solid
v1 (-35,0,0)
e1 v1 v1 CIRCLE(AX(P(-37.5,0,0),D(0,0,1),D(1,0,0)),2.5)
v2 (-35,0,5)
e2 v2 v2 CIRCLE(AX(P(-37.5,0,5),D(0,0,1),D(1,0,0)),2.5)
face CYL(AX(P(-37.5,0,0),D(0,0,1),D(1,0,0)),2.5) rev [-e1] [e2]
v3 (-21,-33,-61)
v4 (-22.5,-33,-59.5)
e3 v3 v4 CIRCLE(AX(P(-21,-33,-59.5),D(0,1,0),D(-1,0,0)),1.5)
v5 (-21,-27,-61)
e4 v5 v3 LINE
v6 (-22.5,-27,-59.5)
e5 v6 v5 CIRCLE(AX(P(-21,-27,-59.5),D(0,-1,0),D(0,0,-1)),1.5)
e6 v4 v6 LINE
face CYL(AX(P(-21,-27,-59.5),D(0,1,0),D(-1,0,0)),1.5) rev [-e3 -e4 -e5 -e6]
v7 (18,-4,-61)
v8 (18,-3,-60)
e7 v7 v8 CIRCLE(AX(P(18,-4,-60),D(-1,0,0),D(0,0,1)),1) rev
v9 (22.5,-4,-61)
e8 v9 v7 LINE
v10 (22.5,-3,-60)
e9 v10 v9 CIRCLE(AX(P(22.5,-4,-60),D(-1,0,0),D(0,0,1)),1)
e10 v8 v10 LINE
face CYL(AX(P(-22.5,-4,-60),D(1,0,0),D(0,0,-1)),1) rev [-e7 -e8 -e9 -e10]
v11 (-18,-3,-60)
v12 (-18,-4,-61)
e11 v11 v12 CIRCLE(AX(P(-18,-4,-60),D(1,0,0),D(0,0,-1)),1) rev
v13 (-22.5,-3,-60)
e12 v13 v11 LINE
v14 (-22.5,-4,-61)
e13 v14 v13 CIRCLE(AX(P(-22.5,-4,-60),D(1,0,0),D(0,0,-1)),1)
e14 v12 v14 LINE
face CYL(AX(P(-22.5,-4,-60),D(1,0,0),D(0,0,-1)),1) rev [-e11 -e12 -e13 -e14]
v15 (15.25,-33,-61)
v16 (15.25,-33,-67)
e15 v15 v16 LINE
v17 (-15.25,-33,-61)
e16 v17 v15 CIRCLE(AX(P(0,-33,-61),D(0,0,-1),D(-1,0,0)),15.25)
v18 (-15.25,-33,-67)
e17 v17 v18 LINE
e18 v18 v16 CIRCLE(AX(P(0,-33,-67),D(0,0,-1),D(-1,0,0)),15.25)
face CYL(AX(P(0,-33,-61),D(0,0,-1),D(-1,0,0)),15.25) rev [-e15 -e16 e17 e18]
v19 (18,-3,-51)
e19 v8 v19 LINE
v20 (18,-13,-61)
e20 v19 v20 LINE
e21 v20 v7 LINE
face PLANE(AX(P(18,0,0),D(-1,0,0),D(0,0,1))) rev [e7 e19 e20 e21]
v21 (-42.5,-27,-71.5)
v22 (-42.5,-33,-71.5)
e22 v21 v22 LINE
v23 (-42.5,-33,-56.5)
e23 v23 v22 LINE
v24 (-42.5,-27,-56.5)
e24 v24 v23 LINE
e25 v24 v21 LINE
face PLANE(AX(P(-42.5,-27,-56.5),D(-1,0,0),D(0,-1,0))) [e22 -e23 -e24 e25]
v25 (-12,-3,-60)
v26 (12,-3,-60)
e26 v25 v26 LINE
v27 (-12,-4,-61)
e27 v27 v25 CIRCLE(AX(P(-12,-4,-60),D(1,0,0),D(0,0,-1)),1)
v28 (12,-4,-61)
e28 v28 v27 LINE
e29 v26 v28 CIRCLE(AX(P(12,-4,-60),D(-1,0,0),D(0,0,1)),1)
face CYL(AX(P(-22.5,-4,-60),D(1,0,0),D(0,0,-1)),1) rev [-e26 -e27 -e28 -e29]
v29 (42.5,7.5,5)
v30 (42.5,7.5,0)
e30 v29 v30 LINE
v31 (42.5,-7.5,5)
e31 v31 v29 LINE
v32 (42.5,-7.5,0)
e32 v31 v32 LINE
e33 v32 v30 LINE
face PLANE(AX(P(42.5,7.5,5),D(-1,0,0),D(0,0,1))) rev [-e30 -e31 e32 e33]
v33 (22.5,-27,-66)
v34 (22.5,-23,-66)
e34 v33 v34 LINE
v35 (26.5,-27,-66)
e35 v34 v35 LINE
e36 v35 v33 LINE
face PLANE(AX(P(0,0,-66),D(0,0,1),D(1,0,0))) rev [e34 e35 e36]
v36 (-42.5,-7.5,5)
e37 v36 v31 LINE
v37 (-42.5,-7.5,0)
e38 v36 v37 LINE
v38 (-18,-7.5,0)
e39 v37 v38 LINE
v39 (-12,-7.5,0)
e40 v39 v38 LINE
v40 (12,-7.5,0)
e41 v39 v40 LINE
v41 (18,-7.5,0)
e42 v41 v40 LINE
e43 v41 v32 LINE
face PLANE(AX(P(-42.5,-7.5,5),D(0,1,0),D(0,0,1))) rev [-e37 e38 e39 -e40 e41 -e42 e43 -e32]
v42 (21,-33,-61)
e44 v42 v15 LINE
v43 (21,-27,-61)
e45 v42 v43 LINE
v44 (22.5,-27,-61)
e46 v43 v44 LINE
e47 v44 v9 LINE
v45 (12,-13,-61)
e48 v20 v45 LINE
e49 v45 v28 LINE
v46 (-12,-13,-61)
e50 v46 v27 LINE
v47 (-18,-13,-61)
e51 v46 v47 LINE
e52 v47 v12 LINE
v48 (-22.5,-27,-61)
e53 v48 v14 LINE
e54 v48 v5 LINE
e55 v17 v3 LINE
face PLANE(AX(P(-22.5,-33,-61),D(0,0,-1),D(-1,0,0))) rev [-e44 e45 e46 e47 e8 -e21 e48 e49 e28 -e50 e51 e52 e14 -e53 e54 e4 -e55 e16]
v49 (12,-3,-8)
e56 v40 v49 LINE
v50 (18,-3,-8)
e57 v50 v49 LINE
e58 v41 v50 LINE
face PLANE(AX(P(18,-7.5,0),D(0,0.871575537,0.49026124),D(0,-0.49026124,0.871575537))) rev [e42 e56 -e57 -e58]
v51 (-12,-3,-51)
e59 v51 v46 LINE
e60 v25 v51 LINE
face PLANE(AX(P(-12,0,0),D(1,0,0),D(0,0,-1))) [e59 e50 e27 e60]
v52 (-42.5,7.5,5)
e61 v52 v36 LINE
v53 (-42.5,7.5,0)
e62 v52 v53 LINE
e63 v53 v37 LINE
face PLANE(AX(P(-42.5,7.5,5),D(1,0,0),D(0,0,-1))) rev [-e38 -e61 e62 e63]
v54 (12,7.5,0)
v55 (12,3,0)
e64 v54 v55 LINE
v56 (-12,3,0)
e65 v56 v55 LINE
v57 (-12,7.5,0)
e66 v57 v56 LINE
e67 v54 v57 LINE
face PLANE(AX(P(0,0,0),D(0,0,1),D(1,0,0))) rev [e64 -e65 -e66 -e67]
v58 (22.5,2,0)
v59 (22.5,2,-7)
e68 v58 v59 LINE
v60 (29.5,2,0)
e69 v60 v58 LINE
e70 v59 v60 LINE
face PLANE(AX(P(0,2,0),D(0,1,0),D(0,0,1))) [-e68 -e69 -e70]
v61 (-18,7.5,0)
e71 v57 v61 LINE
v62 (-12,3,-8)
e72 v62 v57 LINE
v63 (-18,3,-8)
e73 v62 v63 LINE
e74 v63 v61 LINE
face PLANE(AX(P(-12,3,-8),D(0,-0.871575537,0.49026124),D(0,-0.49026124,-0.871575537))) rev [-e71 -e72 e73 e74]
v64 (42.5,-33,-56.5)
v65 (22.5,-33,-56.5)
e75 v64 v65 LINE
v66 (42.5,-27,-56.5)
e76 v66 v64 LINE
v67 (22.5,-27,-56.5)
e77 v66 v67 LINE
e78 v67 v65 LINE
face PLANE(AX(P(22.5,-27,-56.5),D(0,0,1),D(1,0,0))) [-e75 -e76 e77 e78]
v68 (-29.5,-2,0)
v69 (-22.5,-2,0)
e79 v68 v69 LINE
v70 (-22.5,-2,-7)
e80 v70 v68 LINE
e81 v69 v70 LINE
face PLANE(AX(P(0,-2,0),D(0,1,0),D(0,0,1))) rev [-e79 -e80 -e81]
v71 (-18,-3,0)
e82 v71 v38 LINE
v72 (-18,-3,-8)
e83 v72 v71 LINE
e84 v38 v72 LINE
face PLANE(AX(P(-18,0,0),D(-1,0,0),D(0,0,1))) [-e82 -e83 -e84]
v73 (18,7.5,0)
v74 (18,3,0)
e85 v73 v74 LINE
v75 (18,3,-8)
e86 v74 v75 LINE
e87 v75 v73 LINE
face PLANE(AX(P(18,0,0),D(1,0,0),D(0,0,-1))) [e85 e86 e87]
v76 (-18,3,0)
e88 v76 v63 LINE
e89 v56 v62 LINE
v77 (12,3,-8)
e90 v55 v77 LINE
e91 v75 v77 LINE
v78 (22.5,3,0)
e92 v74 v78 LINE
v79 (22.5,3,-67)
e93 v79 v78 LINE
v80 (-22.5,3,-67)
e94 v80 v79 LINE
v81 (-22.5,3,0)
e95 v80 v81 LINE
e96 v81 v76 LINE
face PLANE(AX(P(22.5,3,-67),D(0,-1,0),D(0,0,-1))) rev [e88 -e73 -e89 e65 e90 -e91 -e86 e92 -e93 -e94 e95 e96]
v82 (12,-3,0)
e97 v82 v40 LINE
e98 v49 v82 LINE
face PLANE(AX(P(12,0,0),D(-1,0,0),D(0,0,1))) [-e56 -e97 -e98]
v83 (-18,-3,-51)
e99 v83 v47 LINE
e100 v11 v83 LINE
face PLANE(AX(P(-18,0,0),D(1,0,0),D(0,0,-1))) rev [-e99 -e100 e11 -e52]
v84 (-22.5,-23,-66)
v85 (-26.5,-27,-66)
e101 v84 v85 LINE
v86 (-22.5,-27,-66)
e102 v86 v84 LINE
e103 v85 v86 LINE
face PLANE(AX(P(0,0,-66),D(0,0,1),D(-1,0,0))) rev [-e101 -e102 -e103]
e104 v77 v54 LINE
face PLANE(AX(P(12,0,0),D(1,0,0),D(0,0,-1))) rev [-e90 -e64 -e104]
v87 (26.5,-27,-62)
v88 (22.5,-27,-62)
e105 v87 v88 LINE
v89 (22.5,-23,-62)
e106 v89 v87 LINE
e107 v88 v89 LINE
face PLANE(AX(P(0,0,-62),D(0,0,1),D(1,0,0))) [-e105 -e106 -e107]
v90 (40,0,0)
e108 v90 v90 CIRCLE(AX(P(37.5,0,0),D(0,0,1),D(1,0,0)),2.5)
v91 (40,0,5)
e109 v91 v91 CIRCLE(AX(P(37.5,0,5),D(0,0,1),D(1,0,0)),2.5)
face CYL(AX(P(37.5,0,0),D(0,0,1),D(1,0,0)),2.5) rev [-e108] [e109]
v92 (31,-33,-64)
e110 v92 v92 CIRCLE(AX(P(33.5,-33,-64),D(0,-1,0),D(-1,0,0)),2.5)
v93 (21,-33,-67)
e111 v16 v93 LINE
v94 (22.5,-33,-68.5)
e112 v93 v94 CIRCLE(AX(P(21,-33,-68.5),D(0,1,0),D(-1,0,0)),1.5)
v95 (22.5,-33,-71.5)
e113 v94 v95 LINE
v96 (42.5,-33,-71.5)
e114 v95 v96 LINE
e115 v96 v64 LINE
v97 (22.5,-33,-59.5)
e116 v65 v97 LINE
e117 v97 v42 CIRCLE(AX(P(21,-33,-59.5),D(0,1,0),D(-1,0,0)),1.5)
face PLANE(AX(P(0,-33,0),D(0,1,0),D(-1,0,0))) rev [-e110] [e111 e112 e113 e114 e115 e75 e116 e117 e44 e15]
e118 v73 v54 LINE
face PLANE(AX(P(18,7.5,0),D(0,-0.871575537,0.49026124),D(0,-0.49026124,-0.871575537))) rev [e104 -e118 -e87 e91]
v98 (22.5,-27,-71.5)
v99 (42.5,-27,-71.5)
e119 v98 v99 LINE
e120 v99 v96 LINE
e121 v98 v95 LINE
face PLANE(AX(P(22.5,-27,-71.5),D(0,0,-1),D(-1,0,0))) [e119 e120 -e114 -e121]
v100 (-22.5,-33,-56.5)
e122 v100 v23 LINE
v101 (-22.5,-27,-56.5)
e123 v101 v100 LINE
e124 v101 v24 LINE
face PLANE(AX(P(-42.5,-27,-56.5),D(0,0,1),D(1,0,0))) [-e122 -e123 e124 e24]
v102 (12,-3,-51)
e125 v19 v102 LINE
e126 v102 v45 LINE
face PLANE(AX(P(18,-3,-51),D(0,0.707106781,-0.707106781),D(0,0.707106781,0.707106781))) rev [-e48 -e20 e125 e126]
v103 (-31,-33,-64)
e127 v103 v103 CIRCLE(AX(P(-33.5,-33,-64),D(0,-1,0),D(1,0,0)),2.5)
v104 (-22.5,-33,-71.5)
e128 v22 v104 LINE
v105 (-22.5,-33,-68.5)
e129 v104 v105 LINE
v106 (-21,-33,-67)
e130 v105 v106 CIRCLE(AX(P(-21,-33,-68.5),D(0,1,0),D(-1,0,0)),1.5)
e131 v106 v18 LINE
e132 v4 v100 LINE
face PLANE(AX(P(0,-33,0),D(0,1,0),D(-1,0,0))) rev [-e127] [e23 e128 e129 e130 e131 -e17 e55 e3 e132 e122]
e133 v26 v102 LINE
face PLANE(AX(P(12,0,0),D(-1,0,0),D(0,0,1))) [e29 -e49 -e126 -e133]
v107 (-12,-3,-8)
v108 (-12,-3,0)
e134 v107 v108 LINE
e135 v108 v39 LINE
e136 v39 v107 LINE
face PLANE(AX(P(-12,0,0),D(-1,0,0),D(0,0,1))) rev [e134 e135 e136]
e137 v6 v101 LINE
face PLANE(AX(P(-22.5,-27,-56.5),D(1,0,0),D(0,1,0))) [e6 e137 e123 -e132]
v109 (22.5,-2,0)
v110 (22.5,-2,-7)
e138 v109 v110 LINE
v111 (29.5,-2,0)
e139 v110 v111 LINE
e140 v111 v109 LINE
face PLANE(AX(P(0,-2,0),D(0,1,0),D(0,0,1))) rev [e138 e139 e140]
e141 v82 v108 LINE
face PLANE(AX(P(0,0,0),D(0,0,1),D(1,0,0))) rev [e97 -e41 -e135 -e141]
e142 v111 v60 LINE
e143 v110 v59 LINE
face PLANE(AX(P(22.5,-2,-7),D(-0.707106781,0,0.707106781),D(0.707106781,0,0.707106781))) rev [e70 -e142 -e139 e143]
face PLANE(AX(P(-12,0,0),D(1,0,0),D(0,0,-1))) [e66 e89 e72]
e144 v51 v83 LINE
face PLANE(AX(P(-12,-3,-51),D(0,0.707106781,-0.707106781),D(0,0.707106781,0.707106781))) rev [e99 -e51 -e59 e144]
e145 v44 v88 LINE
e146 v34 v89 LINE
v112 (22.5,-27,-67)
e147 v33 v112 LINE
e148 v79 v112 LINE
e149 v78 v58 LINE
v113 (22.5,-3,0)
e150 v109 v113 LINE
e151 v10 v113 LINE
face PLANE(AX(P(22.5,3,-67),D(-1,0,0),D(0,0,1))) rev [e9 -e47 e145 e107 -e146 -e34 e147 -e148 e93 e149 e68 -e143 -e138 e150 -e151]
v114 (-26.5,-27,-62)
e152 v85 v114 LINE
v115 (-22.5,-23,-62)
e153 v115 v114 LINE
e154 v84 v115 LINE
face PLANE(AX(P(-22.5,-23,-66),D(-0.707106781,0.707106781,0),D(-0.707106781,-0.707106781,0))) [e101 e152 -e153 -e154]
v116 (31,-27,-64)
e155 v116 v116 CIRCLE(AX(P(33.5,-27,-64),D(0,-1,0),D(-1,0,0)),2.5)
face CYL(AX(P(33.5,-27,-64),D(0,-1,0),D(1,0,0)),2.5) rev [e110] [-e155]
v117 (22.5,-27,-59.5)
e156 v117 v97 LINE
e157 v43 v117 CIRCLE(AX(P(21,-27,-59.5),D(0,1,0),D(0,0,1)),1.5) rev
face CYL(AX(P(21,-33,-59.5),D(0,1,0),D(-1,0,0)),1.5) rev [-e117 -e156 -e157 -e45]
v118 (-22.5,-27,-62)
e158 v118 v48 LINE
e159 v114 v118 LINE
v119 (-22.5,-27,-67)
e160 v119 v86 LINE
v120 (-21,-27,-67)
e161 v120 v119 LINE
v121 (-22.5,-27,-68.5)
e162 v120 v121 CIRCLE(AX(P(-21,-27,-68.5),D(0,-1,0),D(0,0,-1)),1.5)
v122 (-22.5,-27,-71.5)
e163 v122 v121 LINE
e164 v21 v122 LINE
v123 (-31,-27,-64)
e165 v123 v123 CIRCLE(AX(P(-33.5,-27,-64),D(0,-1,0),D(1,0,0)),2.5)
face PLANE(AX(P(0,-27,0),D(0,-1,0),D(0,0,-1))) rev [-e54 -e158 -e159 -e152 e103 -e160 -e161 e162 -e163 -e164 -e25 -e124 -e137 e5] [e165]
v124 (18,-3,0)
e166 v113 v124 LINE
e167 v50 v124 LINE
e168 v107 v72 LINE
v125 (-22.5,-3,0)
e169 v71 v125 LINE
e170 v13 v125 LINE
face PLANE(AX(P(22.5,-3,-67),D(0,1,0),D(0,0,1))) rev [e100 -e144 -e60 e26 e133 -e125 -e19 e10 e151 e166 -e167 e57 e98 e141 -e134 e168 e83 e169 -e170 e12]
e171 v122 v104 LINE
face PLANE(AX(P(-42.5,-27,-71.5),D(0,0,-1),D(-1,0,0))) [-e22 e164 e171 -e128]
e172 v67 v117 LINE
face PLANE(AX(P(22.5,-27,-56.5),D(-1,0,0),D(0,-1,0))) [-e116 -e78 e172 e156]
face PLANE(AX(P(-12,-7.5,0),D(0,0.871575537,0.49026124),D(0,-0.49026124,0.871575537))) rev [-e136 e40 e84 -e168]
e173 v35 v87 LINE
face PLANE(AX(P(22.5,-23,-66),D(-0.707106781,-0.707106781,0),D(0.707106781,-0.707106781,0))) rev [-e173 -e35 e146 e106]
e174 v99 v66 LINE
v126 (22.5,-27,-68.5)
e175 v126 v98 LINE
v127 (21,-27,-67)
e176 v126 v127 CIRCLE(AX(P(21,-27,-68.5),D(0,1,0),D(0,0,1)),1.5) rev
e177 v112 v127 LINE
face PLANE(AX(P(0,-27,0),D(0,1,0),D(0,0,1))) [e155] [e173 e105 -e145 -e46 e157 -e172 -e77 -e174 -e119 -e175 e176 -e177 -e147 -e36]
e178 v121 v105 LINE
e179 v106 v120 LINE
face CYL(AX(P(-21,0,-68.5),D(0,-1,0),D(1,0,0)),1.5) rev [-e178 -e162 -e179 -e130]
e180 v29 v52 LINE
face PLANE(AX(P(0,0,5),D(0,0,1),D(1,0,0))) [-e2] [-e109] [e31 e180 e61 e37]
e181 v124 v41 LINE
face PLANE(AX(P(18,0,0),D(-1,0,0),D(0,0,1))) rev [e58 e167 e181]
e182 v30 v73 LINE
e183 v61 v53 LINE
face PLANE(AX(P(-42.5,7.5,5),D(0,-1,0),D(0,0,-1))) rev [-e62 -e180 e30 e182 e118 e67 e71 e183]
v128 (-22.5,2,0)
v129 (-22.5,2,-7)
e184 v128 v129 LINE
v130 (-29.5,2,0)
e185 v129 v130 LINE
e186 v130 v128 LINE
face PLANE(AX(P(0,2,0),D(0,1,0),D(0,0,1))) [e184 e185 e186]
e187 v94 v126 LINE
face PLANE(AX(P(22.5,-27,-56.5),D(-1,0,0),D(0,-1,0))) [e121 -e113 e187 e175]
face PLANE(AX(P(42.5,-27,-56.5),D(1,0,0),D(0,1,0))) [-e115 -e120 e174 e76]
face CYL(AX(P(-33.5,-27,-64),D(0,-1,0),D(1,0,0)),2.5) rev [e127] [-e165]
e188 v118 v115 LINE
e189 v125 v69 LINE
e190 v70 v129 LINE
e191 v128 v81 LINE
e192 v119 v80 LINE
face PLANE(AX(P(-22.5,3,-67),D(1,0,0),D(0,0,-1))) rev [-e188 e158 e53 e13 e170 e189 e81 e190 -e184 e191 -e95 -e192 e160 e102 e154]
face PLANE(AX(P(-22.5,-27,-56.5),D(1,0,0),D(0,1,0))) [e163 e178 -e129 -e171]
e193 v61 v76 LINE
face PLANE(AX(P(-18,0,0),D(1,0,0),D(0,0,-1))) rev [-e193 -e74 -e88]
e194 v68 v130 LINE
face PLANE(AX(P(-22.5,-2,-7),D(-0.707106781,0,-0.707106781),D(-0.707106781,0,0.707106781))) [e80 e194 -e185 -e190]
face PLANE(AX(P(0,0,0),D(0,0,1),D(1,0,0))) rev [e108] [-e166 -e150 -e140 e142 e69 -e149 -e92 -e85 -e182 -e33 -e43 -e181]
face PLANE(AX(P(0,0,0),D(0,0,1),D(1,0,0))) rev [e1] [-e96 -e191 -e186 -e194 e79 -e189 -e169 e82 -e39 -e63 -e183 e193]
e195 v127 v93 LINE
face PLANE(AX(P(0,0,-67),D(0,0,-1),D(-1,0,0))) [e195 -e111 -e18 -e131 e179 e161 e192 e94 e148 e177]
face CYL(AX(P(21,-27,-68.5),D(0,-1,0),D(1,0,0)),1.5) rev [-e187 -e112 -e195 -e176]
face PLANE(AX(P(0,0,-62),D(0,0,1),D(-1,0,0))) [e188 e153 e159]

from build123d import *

# Parameters (mm, degrees)
SKETCH_1_W          = 85
SKETCH_1_H          = 15
EXTRUDE_1_DEPTH     = 5
SKETCH_2_R          = 2.5
CUT_EXTRUDE_1_DEPTH = 5
SKETCH_3_W          = 45
SKETCH_3_H          = 6
EXTRUDE_2_DEPTH     = 67
SKETCH_4_W          = 45
SKETCH_4_H          = 6
EXTRUDE_3_DEPTH     = 30
SKETCH_7_W          = 20
SKETCH_7_H          = 15
EXTRUDE_4_DEPTH     = 6
CUT_EXTRUDE_3_DEPTH = 6
EXTRUDE_5_DEPTH     = 3
EXTRUDE_6_DEPTH     = 3
FILLET_1_R          = 1
SKETCH_11_R         = 2.5
CUT_EXTRUDE_4_DEPTH = 6
FILLET_2_R          = 1.5
EXTRUDE_7_DEPTH     = 2
EXTRUDE_8_DEPTH     = 2
EXTRUDE_9_DEPTH     = 3
EXTRUDE_10_DEPTH    = 3


with BuildPart() as part:
    # 草图1 → 凸台-拉伸1 (new body)
    with BuildSketch(Plane.XY):
        Rectangle(SKETCH_1_W, SKETCH_1_H)
    extrude(amount=EXTRUDE_1_DEPTH)

    # 草图2 → 切除-拉伸1 (cut)
    with BuildSketch(Plane.XY.offset(5)):
        with Locations((-37.5, 0)):
            Circle(SKETCH_2_R)
        with Locations((37.5, 0)):
            Circle(SKETCH_2_R)
    extrude(amount=-CUT_EXTRUDE_1_DEPTH, mode=Mode.SUBTRACT)

    # 草图3 → 凸台-拉伸2 (add)
    with BuildSketch(Plane(origin=(0, 0, 0), x_dir=(-1, 0, 0), z_dir=(0, 0, -1))):
        Rectangle(SKETCH_3_W, SKETCH_3_H)
    extrude(amount=EXTRUDE_2_DEPTH)

    # 草图4 → 凸台-拉伸3 (add)
    with BuildSketch(Plane.XZ.offset(3)):
        with Locations((0, -64)):
            Rectangle(SKETCH_4_W, SKETCH_4_H)
    extrude(amount=EXTRUDE_3_DEPTH)

    # 草图7 → 凸台-拉伸4 (add)
    with BuildSketch(Plane.XZ.offset(33)):
        with Locations((32.5, -64)):
            Rectangle(SKETCH_7_W, SKETCH_7_H)
        with Locations((-32.5, -64)):
            Rectangle(SKETCH_7_W, SKETCH_7_H)
    extrude(amount=-EXTRUDE_4_DEPTH)

    # 草图5 → 切除-拉伸3 (cut)
    with BuildSketch(Plane(origin=(0, 0, -67), x_dir=(-1, 0, 0), z_dir=(0, 0, -1))):
        with BuildLine():
            Line((-15.25, -33), (15.25, -33))
            ThreePointArc((15.25, -33), (0, -17.75), (-15.25, -33))
        make_face()
    extrude(amount=-CUT_EXTRUDE_3_DEPTH, mode=Mode.SUBTRACT)

    # 草图8 → 凸台-拉伸5 (add, symmetric)
    with BuildSketch(Plane(origin=(15, 0, 0), x_dir=(0, 0, -1), z_dir=(1, 0, 0))):
        Polygon((51, -3), (61, -13), (61, -3), align=None)
    extrude(amount=EXTRUDE_5_DEPTH, both=True)

    # 草图10 → 凸台-拉伸6 (add, symmetric)
    with BuildSketch(Plane(origin=(-15, 0, 0), x_dir=(0, 0, -1), z_dir=(1, 0, 0))):
        Polygon((61, -3), (51, -3), (61, -13), align=None)
    extrude(amount=EXTRUDE_6_DEPTH, both=True)

    # 圆角1
    fillet_1_edges = [part.edges().sort_by_distance(p)[0] for p in [
        (-20.25, -3, -61),
        (20.25, -3, -61),
        (0, -3, -61),
    ]]
    fillet(fillet_1_edges, radius=FILLET_1_R)

    # 草图11 → 切除-拉伸4 (cut)
    with BuildSketch(Plane.XZ.offset(33)):
        with Locations((-33.5, -64)):
            Circle(SKETCH_11_R)
        with Locations(Location((33.5, -64, 0), (0, 0, 180))):
            Circle(SKETCH_11_R)
    extrude(amount=-CUT_EXTRUDE_4_DEPTH, mode=Mode.SUBTRACT)

    # 圆角2
    # the kernel refuses this fillet: 1.5 mm, written as the material it adds along each edge
    with BuildSketch(Plane(origin=(-22.5, -27, -67), x_dir=(1, 0, 0), z_dir=(0, -1, 0)), Plane(origin=(22.5, -27, -61), x_dir=(-1, 0, 0), z_dir=(0, -1, 0)), Plane(origin=(22.5, -33, -67), x_dir=(-1, 0, 0), z_dir=(0, 1, 0))) as fillet_2_piece_1:
        with BuildLine():
            CenterArc((FILLET_2_R, -FILLET_2_R), FILLET_2_R, 90, 90)
            Line((0, -FILLET_2_R), (0, 0))
            Line((0, 0), (FILLET_2_R, 0))
        make_face()
    extrude(amount=6)
    with BuildSketch(Plane(origin=(-22.5, -27, -61), x_dir=(1, 0, 0), z_dir=(0, -1, 0))) as fillet_2_piece_2:
        with BuildLine():
            CenterArc((FILLET_2_R, FILLET_2_R), FILLET_2_R, 180, 90)
            Line((0, FILLET_2_R), (0, 0))
            Line((0, 0), (FILLET_2_R, 0))
        make_face()
    extrude(amount=6)

    # 草图12 → 凸台-拉伸7 (add, symmetric)
    with BuildSketch(Plane(origin=(0, 0, -64), x_dir=(-1, 0, 0), z_dir=(0, 0, -1))):
        Polygon((-22.5, -23), (-26.5, -27), (-22.5, -27), align=None)
    extrude_7 = extrude(amount=EXTRUDE_7_DEPTH, both=True)

    # 镜向1: 凸台-拉伸7 across plane
    add(extrude_7.mirror(Plane(origin=(0, 0, 0), x_dir=(0, 0, 1), z_dir=(1, 0, 0))))

    # 草图13 → 凸台-拉伸8 (add, symmetric)
    with BuildSketch(Plane(origin=(0, 0, 0), x_dir=(-1, 0, 0), z_dir=(0, -1, 0))):
        Polygon((-22.5, 7), (-29.5, 0), (-22.5, 0), align=None)
    extrude_8 = extrude(amount=EXTRUDE_8_DEPTH, both=True)

    # 镜向2: 凸台-拉伸8 across plane
    add(extrude_8.mirror(Plane(origin=(0, 0, 0), x_dir=(0, 0, 1), z_dir=(1, 0, 0))))

    # 草图14 → 凸台-拉伸9 (add, symmetric)
    with BuildSketch(Plane(origin=(15, 0, 0), x_dir=(0, 0, -1), z_dir=(1, 0, 0))):
        Polygon((0, 7.5), (8, 3), (0, 3), align=None)
        Polygon((8, -3), (0, -3), (0, -7.5), align=None)
    extrude(amount=EXTRUDE_9_DEPTH, both=True)

    # 草图15 → 凸台-拉伸10 (add, symmetric)
    with BuildSketch(Plane(origin=(-15, 0, 0), x_dir=(0, 0, -1), z_dir=(1, 0, 0))):
        Polygon((0, -7.5), (8, -3), (0, -3), align=None)
        Polygon((0, 7.5), (0, 3), (8, 3), align=None)
    extrude(amount=EXTRUDE_10_DEPTH, both=True)


solid = part.part
